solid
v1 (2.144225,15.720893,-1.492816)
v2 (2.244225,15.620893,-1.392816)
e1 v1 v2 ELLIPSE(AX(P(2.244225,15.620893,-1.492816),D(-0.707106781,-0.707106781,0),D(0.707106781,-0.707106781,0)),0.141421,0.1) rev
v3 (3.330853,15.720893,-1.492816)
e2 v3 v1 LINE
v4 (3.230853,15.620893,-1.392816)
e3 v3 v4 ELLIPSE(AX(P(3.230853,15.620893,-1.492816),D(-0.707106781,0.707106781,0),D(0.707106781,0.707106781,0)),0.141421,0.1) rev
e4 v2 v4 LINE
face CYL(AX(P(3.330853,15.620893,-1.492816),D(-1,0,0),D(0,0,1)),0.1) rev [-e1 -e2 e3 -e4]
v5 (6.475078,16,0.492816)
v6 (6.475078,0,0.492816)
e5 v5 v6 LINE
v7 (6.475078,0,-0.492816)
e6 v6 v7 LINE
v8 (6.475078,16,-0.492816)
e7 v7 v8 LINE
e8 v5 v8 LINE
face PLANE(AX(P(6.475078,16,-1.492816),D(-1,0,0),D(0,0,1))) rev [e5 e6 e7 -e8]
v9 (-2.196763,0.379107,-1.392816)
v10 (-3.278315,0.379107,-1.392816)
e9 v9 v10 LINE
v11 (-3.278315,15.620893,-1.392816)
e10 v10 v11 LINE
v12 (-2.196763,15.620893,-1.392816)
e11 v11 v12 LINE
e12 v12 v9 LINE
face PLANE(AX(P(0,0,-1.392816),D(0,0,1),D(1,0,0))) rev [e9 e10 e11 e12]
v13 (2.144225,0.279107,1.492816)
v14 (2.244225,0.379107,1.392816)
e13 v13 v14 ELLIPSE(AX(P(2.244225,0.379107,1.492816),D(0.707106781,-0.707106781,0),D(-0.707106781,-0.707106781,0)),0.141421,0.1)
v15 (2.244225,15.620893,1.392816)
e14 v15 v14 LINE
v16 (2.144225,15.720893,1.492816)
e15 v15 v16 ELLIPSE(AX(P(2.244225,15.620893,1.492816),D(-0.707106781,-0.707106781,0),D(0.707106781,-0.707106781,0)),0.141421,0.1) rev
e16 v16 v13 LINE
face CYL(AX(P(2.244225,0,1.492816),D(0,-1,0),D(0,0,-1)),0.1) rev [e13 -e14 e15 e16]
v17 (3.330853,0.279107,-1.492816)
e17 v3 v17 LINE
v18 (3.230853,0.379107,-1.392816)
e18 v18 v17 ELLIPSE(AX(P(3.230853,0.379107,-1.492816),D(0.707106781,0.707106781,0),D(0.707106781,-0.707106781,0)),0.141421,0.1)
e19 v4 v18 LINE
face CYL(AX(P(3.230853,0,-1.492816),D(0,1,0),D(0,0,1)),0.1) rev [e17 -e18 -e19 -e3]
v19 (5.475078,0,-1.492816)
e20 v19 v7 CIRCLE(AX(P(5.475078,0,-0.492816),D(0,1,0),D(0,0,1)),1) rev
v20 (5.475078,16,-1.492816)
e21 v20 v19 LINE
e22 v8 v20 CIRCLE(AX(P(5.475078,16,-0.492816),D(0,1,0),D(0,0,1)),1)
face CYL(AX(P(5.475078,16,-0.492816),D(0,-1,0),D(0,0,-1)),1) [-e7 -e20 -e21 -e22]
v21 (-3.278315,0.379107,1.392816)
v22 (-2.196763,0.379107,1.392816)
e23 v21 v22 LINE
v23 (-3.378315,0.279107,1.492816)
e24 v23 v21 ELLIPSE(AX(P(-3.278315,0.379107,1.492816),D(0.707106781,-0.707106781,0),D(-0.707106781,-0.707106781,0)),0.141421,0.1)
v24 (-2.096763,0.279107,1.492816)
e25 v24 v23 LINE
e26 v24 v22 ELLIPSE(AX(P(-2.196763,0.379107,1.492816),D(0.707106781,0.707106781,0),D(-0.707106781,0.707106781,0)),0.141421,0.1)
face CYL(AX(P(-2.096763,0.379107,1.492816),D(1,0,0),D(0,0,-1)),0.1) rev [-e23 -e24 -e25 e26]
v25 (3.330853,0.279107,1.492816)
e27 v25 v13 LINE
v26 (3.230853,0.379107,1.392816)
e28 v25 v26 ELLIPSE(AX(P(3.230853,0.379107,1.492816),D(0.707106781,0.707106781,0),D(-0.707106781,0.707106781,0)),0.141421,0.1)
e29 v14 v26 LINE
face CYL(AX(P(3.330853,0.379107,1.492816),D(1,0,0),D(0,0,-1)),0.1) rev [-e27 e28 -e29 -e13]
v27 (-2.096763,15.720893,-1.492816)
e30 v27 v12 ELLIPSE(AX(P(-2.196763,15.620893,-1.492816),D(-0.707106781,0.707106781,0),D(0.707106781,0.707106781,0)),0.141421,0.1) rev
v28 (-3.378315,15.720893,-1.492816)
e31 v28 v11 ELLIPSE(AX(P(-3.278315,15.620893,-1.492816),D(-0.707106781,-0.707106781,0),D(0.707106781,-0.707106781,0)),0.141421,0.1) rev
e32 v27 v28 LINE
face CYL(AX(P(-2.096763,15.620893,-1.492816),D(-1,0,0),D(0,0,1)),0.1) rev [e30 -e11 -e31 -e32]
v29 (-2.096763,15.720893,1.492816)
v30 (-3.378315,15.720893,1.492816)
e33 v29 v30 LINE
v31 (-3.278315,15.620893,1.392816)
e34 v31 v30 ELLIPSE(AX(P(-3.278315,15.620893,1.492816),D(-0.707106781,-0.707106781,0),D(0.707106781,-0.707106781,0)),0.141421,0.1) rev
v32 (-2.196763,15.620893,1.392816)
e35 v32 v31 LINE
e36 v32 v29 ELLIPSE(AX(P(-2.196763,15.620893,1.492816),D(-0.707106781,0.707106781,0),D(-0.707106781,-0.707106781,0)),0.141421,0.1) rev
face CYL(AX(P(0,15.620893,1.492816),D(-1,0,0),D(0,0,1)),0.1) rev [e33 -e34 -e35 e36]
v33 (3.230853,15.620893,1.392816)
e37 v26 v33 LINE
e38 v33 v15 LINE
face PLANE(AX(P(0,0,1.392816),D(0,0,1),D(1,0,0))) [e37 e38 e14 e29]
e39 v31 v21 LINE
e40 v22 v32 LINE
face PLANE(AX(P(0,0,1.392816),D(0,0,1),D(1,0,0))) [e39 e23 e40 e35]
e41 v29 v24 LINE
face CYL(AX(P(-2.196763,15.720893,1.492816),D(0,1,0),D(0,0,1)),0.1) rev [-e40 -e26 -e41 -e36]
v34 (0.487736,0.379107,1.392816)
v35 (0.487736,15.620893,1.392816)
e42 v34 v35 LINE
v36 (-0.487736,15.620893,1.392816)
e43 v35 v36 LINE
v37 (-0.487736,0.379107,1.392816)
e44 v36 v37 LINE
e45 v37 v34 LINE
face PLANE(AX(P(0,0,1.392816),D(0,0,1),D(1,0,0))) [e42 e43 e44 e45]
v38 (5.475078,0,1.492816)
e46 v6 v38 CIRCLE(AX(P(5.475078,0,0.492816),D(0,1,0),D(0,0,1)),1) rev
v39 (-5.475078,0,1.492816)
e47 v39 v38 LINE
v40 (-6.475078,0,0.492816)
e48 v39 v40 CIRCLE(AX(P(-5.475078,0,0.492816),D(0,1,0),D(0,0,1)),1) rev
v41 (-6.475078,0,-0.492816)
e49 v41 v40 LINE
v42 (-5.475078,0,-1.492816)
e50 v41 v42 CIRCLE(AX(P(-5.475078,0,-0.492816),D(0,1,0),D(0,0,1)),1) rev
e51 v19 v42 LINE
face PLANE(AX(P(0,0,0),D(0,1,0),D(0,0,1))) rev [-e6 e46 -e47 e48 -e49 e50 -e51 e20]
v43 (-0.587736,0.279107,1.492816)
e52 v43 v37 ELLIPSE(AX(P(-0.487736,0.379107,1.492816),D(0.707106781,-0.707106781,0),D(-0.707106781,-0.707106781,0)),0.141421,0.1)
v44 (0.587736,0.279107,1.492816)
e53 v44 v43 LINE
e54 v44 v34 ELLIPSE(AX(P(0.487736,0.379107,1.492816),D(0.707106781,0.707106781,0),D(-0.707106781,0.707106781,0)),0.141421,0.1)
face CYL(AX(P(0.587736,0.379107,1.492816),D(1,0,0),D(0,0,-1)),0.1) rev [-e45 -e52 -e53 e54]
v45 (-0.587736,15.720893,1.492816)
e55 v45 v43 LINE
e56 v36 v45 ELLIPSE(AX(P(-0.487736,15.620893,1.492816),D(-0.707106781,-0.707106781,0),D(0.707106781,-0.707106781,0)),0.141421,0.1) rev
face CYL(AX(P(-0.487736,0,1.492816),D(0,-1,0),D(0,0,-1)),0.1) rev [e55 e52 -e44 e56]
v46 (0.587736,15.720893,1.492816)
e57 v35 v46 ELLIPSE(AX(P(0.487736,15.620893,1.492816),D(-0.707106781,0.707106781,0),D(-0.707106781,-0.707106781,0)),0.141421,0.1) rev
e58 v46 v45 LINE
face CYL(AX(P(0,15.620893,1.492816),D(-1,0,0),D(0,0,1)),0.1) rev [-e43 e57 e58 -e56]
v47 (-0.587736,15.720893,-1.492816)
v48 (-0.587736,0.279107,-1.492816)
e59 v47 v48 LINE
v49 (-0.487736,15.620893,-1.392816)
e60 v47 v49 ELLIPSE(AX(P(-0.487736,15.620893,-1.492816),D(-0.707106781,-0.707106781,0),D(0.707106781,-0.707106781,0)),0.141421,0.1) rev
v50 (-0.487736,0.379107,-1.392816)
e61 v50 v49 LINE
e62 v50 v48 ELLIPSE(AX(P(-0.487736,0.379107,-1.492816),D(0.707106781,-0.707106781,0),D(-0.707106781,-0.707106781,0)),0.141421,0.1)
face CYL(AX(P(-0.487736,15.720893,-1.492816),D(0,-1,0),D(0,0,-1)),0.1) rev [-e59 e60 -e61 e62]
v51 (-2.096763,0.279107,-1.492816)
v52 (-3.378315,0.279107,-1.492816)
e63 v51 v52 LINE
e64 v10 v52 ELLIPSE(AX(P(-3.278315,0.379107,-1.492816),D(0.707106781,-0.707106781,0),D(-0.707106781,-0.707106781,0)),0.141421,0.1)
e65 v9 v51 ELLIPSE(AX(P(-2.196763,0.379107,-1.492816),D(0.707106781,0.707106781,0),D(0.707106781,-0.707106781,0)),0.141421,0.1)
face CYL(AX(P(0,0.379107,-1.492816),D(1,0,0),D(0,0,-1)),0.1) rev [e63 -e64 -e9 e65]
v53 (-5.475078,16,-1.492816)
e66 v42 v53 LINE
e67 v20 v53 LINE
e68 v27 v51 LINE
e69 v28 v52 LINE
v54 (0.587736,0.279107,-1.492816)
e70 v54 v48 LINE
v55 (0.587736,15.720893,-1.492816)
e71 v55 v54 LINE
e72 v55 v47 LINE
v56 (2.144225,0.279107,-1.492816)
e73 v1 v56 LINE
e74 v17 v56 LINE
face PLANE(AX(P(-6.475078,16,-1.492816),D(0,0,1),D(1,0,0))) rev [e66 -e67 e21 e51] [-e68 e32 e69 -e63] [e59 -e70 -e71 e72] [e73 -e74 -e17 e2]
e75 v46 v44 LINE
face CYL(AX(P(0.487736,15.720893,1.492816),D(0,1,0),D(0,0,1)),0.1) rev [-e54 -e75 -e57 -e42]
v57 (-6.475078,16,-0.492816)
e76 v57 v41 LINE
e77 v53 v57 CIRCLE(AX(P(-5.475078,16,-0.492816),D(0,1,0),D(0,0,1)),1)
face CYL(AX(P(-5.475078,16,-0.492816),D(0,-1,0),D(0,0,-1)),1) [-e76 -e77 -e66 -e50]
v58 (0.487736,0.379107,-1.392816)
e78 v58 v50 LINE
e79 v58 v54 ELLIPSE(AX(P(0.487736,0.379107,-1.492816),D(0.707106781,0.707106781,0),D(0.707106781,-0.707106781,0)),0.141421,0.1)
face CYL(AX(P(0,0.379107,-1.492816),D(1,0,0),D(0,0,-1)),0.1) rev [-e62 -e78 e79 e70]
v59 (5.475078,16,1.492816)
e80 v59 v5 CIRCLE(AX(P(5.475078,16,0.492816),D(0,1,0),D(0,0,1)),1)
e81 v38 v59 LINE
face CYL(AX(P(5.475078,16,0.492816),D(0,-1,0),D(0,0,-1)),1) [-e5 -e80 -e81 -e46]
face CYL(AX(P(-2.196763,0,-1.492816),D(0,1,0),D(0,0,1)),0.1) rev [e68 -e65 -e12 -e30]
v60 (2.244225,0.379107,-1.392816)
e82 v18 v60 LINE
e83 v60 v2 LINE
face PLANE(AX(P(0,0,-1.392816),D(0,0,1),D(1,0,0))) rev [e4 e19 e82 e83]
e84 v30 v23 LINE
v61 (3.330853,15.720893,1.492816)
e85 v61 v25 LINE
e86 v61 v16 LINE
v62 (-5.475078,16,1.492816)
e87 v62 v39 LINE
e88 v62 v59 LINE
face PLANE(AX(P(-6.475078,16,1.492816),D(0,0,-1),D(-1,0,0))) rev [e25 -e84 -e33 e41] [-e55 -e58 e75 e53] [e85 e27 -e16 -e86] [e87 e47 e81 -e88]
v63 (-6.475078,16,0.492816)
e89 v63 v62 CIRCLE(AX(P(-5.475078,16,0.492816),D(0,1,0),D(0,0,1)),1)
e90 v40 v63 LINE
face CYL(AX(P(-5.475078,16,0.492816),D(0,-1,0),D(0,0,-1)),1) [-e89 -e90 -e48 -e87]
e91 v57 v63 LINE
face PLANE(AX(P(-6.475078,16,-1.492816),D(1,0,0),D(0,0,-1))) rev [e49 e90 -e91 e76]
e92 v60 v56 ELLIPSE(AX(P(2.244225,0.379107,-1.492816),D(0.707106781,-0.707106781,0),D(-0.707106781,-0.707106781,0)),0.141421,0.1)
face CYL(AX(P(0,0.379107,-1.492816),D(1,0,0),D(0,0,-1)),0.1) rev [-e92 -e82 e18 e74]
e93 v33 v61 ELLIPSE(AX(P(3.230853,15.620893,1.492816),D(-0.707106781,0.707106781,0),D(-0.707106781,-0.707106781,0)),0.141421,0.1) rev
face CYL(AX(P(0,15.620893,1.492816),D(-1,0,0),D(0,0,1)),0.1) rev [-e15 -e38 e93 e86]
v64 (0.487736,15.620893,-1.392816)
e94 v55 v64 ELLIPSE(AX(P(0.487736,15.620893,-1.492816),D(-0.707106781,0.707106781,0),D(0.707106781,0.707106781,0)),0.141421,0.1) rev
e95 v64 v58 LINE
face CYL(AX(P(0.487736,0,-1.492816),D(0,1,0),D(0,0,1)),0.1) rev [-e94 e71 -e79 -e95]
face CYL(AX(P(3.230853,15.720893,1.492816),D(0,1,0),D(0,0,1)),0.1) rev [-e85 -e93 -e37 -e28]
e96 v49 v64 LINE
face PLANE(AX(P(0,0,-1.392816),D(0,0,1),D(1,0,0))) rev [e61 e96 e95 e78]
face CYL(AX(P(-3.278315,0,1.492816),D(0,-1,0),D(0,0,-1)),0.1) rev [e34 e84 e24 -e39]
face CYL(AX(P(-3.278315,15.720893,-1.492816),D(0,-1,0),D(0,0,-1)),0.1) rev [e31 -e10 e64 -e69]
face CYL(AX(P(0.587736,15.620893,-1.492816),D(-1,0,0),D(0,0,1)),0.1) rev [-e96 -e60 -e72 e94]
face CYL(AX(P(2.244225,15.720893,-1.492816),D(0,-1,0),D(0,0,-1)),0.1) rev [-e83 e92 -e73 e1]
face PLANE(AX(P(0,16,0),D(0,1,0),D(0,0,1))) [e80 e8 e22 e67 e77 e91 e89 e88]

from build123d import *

# Parameters (mm, degrees)
SKETCH1_W           = 12.950156288
SKETCH1_H           = 2.985631362
BOSS_EXTRUDE1_DEPTH = 16
FILLET1_R           = 1
SKETCH2_W           = 10.950156288
SKETCH2_H           = 0.272417851
BOSS_EXTRUDE2_DEPTH = 0.1
FILLET2_R           = 0.1
CUT_EXTRUDE2_DEPTH  = 0.1
SKETCH6_W           = 1.186627285
SKETCH6_H           = 15.441785482
SKETCH6_W_2         = 1.175471446
SKETCH6_W_3         = 1.281551352
CUT_EXTRUDE3_DEPTH  = 0.1
SKETCH10_W          = 1.186627285
SKETCH10_H          = 15.441785482
SKETCH10_W_2        = 1.175471446
SKETCH10_W_3        = 1.281551352
CUT_EXTRUDE4_DEPTH  = 0.1
FILLET6_R           = 0.1
FILLET7_R           = 0.1


with BuildPart() as part:
    # Sketch1 → Boss-Extrude1 (new body)
    with BuildSketch(Plane(origin=(0, 0, 0), x_dir=(1, 0, 0), z_dir=(0, 1, 0))):
        Rectangle(SKETCH1_W, SKETCH1_H)
    extrude(amount=BOSS_EXTRUDE1_DEPTH)

    # Fillet1
    fillet1_edges = [part.edges().sort_by_distance(p)[0] for p in [
        (6.475078144, 8, 1.492815681),
        (-6.475078144, 8, 1.492815681),
        (-6.475078144, 8, -1.492815681),
        (6.475078144, 8, -1.492815681),
    ]]
    fillet(fillet1_edges, radius=FILLET1_R)

    # Sketch2 → Boss-Extrude2 (add)
    with BuildSketch(Plane(origin=(0, 0, -1.492815681), x_dir=(-1, 0, 0), z_dir=(0, 0, -1))):
        with Locations((0, 10.703223293)):
            Rectangle(SKETCH2_W, SKETCH2_H)
    extrude(amount=BOSS_EXTRUDE2_DEPTH)

    # Fillet2
    fillet2_edges = [part.edges().sort_by_distance(p)[0] for p in [
        (0, 10.839432218, -1.592815681),
        (-5.475078144, 10.703223292, -1.592815681),
        (0, 10.567014367, -1.592815681),
        (5.475078144, 10.703223292, -1.592815681),
    ]]
    fillet(fillet2_edges, radius=FILLET2_R - 0.0001)  # a hair under: the kernel refuses the full size

    # Sketch5 → Cut-Extrude2 (cut)
    with BuildSketch(Plane(origin=(0, 0, -1.592815681), x_dir=(-1, 0, 0), z_dir=(0, 0, -1))):
        Polygon((-5.375078144, 10.567014367), (5.475078144, 10.567014367), (5.475078144, 10.739432218), (5.475078144, 10.839432218), (-5.375078144, 10.839432218), (-5.475078144, 10.839432218), (-5.475078144, 10.567014367), align=None)
    extrude(amount=-CUT_EXTRUDE2_DEPTH, mode=Mode.SUBTRACT)

    # Sketch6 → Cut-Extrude3 (cut)
    with BuildSketch(Plane(origin=(0, 0, -1.492815681), x_dir=(-1, 0, 0), z_dir=(0, 0, -1))):
        with Locations((-2.737539072, 8)):
            Rectangle(SKETCH6_W, SKETCH6_H)
        with Locations((0, 8)):
            Rectangle(SKETCH6_W_2, SKETCH6_H)
        with Locations((2.737539072, 8)):
            Rectangle(SKETCH6_W_3, SKETCH6_H)
    extrude(amount=-CUT_EXTRUDE3_DEPTH, mode=Mode.SUBTRACT)

    # Sketch10 → Cut-Extrude4 (cut)
    with BuildSketch(Plane.XY.offset(1.492815681)):
        with Locations((2.737539072, 8)):
            Rectangle(SKETCH10_W, SKETCH10_H)
        with Locations((0, 8)):
            Rectangle(SKETCH10_W_2, SKETCH10_H)
        with Locations((-2.737539072, 8)):
            Rectangle(SKETCH10_W_3, SKETCH10_H)
    extrude(amount=-CUT_EXTRUDE4_DEPTH, mode=Mode.SUBTRACT)

    # Fillet6
    fillet6_edges = [part.edges().sort_by_distance(p)[0] for p in [
        (2.144225429, 8, 1.392815681),
        (2.737539072, 15.720892741, 1.392815681),
        (3.330852714, 8, 1.392815681),
        (2.737539072, 0.279107259, 1.392815681),
        (-0.587735723, 8, 1.392815681),
        (0, 15.720892741, 1.392815681),
        (0.587735723, 8, 1.392815681),
        (0, 0.279107259, 1.392815681),
        (-3.378314748, 8, 1.392815681),
        (-2.737539072, 15.720892741, 1.392815681),
        (-2.096763396, 8, 1.392815681),
        (-2.737539072, 0.279107259, 1.392815681),
    ]]
    fillet(fillet6_edges, radius=FILLET6_R - 0.0001)  # a hair under: the kernel refuses the full size

    # Fillet7
    fillet7_edges = [part.edges().sort_by_distance(p)[0] for p in [
        (-3.378314748, 8, -1.392815681),
        (-2.737539072, 0.279107259, -1.392815681),
        (-2.096763396, 8, -1.392815681),
        (-2.737539072, 15.720892741, -1.392815681),
        (-0.587735723, 8, -1.392815681),
        (0, 0.279107259, -1.392815681),
        (0.587735723, 8, -1.392815681),
        (0, 15.720892741, -1.392815681),
        (2.144225429, 8, -1.392815681),
        (2.737539072, 0.279107259, -1.392815681),
        (3.330852714, 8, -1.392815681),
        (2.737539072, 15.720892741, -1.392815681),
    ]]
    fillet(fillet7_edges, radius=FILLET7_R - 0.0001)  # a hair under: the kernel refuses the full size


solid = part.part
